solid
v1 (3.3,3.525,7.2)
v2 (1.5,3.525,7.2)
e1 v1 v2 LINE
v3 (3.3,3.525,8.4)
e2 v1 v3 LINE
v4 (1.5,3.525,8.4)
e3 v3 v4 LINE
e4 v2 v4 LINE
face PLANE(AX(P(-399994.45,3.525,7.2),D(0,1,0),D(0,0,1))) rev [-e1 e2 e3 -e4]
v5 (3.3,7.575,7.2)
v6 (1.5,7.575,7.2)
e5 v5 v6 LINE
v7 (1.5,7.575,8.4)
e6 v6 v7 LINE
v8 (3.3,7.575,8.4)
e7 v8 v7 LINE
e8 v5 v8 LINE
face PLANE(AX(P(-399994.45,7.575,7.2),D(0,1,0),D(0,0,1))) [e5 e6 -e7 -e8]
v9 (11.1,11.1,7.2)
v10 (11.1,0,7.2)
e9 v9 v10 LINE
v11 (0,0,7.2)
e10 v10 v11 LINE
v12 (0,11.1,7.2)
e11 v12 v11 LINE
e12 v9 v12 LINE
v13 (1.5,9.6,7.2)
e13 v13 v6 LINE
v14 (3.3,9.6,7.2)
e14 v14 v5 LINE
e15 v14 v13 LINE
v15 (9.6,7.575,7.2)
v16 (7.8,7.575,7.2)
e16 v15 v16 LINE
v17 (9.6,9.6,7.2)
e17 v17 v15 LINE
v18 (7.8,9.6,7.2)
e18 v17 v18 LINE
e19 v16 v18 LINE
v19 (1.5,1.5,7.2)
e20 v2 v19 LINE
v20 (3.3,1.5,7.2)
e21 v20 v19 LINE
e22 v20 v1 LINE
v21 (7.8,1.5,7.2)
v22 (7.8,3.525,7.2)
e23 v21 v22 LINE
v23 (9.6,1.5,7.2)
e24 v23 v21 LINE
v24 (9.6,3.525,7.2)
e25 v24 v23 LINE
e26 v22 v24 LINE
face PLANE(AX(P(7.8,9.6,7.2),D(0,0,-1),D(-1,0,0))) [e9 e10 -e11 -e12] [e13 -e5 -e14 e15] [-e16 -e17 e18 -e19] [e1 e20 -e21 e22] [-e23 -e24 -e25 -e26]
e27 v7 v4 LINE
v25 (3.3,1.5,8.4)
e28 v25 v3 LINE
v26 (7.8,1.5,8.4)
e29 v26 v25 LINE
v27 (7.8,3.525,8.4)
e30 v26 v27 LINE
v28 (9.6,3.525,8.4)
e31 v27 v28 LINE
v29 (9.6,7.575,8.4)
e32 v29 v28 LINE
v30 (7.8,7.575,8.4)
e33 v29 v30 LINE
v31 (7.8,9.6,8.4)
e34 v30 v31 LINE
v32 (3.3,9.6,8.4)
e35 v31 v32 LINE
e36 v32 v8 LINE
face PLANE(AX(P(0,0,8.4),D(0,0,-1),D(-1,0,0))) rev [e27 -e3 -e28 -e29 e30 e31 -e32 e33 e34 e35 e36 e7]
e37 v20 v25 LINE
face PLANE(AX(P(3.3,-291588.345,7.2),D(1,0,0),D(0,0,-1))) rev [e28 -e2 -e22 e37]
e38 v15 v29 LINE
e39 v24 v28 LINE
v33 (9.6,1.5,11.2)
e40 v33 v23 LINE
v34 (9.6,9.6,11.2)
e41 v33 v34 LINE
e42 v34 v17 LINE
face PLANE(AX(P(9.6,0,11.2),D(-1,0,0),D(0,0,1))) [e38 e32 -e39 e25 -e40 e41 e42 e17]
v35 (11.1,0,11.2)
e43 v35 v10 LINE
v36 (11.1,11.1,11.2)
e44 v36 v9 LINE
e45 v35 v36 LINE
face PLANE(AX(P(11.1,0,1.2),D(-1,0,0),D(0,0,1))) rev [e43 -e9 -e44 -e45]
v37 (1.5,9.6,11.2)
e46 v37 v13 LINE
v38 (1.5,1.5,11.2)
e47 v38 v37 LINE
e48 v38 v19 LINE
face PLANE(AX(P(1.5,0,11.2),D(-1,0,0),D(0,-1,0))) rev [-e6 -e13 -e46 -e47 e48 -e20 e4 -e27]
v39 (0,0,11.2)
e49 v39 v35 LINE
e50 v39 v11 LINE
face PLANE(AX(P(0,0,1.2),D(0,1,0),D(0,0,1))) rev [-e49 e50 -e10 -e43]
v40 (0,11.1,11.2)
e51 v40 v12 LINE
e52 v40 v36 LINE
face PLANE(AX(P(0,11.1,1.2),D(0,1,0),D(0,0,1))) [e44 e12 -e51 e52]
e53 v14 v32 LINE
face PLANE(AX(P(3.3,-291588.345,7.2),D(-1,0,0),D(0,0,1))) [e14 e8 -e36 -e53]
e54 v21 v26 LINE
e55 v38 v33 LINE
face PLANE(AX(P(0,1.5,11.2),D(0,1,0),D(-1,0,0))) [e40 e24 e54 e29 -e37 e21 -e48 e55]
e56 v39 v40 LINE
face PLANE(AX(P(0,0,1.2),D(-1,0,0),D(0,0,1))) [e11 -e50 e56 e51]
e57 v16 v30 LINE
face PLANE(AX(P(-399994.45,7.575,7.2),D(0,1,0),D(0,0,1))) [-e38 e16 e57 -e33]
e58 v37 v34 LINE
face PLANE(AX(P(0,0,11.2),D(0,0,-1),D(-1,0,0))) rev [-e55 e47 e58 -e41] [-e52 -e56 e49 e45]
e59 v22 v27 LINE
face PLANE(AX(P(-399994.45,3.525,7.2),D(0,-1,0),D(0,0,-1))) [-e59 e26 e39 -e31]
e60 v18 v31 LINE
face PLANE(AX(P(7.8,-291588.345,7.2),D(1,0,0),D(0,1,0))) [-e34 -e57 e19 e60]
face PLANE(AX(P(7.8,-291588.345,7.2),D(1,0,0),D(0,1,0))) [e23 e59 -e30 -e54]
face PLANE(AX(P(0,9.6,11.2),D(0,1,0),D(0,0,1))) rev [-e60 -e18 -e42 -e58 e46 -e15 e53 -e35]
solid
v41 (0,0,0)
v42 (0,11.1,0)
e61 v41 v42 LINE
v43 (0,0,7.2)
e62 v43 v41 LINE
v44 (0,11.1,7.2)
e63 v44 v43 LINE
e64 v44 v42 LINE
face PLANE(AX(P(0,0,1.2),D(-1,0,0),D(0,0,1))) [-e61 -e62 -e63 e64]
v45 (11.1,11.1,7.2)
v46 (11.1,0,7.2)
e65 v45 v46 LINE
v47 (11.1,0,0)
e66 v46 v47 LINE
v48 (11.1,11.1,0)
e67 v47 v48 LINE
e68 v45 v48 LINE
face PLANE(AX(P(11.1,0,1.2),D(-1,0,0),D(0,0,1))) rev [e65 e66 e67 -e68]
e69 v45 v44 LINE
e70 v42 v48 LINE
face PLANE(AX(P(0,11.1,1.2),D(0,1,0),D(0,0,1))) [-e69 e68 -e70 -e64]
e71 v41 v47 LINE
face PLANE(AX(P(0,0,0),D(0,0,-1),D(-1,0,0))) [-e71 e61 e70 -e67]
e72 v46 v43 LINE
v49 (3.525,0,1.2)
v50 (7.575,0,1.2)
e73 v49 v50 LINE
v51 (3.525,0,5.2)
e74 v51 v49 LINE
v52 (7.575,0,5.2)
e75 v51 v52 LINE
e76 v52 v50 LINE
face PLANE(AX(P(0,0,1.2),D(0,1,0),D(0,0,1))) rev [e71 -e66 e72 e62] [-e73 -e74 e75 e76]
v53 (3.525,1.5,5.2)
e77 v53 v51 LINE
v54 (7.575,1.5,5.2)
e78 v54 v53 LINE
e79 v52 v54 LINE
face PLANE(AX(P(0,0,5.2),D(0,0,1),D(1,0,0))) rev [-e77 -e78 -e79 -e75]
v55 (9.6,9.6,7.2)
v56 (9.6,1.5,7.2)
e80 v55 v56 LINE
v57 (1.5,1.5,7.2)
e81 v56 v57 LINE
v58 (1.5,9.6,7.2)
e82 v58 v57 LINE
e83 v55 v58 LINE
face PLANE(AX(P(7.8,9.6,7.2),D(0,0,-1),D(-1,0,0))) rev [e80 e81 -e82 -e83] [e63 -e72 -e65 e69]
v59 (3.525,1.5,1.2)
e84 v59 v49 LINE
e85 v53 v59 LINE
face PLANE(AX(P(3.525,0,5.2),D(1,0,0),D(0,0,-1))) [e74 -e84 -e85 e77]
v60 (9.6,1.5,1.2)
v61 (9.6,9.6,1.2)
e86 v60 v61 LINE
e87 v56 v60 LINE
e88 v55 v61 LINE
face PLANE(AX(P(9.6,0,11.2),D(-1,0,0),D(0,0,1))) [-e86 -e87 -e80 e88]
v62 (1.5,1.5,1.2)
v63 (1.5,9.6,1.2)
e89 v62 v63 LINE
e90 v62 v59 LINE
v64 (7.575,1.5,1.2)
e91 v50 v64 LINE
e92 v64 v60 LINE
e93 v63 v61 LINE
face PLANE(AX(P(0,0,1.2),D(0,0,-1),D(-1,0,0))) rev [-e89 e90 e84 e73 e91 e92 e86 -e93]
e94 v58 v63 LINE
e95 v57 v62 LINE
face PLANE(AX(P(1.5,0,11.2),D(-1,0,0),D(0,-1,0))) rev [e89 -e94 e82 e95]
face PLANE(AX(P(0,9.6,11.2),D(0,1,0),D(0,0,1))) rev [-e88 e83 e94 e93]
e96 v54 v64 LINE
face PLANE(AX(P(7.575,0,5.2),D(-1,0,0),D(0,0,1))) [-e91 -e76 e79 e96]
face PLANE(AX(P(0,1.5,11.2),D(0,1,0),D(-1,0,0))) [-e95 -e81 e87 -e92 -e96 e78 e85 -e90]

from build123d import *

# Parameters (mm, degrees)
SKETCH1_W           = 11.1
SKETCH1_H           = 11.1
BOSS_EXTRUDE1_DEPTH = 1.2
BOSS_EXTRUDE2_START = 1.2
SKETCH1_3_W         = 11.1
SKETCH1_3_H         = 11.1
SKETCH1_3_W_2       = 8.1
SKETCH1_3_H_2       = 8.1
BOSS_EXTRUDE2_DEPTH = 10
BOSS_EXTRUDE3_START = 8.4
SKETCH1_4_W         = 11.1
SKETCH1_4_H         = 11.1
SKETCH1_4_W_2       = 8.1
SKETCH1_4_H_2       = 8.1
BOSS_EXTRUDE3_DEPTH = 1.2
SKETCH2_W           = 4.05
SKETCH2_H           = 1.5
CUT_EXTRUDE1_DEPTH  = 4


# Read off the part's stored shape, not the designer's step: Split2
with BuildPart() as part:
    # Sketch1 → Boss-Extrude1 (new body)
    with BuildSketch(Plane.XY):
        with Locations((5.55, 5.55)):
            Rectangle(SKETCH1_W, SKETCH1_H)
    extrude(amount=BOSS_EXTRUDE1_DEPTH)

    # Sketch1<3> → Boss-Extrude2 (add)
    with BuildSketch(Plane.XY.offset(BOSS_EXTRUDE2_START)):
        with Locations((5.55, 5.55)):
            Rectangle(SKETCH1_3_W, SKETCH1_3_H)
        with Locations((5.55, 5.55)):
            Rectangle(SKETCH1_3_W_2, SKETCH1_3_H_2, mode=Mode.SUBTRACT)
    extrude(amount=BOSS_EXTRUDE2_DEPTH)

    # Sketch1<4> → Boss-Extrude3 (add)
    # profile 1 of 2: a face of its own
    with BuildSketch(Plane.XY.offset(BOSS_EXTRUDE3_START)):
        with Locations((5.55, 5.55)):
            Rectangle(SKETCH1_4_W, SKETCH1_4_H)
        with Locations((5.55, 5.55)):
            Rectangle(SKETCH1_4_W_2, SKETCH1_4_H_2, mode=Mode.SUBTRACT)
    # profile 2 of 2: a face of its own
    with BuildSketch(Plane.XY.offset(BOSS_EXTRUDE3_START)):
        Polygon((3.3, 3.525), (3.3, 1.5), (7.8, 1.5), (7.8, 3.525), (9.6, 3.525), (9.6, 7.575), (7.8, 7.575), (7.8, 9.6), (3.3, 9.6), (3.3, 7.575), (1.5, 7.575), (1.5, 3.525), align=None)
    extrude(amount=-BOSS_EXTRUDE3_DEPTH)


with BuildPart() as body_2:
    # Split2: the piece on the far side of the plane
    add(part.part)
    split(bisect_by=Plane.XY.offset(7.2), keep=Keep.BOTTOM)

    # Sketch2 → Cut-Extrude1 (cut)
    with BuildSketch(Plane.XY.offset(1.2)):
        with Locations((5.55, 0.75)):
            Rectangle(SKETCH2_W, SKETCH2_H)
    extrude(amount=CUT_EXTRUDE1_DEPTH, mode=Mode.SUBTRACT)


with BuildPart() as part_1:
    add(part.part)

    # Split2
    split(bisect_by=Plane.XY.offset(7.2), keep=Keep.TOP)


solid = Compound([body_2.part, part_1.part])
